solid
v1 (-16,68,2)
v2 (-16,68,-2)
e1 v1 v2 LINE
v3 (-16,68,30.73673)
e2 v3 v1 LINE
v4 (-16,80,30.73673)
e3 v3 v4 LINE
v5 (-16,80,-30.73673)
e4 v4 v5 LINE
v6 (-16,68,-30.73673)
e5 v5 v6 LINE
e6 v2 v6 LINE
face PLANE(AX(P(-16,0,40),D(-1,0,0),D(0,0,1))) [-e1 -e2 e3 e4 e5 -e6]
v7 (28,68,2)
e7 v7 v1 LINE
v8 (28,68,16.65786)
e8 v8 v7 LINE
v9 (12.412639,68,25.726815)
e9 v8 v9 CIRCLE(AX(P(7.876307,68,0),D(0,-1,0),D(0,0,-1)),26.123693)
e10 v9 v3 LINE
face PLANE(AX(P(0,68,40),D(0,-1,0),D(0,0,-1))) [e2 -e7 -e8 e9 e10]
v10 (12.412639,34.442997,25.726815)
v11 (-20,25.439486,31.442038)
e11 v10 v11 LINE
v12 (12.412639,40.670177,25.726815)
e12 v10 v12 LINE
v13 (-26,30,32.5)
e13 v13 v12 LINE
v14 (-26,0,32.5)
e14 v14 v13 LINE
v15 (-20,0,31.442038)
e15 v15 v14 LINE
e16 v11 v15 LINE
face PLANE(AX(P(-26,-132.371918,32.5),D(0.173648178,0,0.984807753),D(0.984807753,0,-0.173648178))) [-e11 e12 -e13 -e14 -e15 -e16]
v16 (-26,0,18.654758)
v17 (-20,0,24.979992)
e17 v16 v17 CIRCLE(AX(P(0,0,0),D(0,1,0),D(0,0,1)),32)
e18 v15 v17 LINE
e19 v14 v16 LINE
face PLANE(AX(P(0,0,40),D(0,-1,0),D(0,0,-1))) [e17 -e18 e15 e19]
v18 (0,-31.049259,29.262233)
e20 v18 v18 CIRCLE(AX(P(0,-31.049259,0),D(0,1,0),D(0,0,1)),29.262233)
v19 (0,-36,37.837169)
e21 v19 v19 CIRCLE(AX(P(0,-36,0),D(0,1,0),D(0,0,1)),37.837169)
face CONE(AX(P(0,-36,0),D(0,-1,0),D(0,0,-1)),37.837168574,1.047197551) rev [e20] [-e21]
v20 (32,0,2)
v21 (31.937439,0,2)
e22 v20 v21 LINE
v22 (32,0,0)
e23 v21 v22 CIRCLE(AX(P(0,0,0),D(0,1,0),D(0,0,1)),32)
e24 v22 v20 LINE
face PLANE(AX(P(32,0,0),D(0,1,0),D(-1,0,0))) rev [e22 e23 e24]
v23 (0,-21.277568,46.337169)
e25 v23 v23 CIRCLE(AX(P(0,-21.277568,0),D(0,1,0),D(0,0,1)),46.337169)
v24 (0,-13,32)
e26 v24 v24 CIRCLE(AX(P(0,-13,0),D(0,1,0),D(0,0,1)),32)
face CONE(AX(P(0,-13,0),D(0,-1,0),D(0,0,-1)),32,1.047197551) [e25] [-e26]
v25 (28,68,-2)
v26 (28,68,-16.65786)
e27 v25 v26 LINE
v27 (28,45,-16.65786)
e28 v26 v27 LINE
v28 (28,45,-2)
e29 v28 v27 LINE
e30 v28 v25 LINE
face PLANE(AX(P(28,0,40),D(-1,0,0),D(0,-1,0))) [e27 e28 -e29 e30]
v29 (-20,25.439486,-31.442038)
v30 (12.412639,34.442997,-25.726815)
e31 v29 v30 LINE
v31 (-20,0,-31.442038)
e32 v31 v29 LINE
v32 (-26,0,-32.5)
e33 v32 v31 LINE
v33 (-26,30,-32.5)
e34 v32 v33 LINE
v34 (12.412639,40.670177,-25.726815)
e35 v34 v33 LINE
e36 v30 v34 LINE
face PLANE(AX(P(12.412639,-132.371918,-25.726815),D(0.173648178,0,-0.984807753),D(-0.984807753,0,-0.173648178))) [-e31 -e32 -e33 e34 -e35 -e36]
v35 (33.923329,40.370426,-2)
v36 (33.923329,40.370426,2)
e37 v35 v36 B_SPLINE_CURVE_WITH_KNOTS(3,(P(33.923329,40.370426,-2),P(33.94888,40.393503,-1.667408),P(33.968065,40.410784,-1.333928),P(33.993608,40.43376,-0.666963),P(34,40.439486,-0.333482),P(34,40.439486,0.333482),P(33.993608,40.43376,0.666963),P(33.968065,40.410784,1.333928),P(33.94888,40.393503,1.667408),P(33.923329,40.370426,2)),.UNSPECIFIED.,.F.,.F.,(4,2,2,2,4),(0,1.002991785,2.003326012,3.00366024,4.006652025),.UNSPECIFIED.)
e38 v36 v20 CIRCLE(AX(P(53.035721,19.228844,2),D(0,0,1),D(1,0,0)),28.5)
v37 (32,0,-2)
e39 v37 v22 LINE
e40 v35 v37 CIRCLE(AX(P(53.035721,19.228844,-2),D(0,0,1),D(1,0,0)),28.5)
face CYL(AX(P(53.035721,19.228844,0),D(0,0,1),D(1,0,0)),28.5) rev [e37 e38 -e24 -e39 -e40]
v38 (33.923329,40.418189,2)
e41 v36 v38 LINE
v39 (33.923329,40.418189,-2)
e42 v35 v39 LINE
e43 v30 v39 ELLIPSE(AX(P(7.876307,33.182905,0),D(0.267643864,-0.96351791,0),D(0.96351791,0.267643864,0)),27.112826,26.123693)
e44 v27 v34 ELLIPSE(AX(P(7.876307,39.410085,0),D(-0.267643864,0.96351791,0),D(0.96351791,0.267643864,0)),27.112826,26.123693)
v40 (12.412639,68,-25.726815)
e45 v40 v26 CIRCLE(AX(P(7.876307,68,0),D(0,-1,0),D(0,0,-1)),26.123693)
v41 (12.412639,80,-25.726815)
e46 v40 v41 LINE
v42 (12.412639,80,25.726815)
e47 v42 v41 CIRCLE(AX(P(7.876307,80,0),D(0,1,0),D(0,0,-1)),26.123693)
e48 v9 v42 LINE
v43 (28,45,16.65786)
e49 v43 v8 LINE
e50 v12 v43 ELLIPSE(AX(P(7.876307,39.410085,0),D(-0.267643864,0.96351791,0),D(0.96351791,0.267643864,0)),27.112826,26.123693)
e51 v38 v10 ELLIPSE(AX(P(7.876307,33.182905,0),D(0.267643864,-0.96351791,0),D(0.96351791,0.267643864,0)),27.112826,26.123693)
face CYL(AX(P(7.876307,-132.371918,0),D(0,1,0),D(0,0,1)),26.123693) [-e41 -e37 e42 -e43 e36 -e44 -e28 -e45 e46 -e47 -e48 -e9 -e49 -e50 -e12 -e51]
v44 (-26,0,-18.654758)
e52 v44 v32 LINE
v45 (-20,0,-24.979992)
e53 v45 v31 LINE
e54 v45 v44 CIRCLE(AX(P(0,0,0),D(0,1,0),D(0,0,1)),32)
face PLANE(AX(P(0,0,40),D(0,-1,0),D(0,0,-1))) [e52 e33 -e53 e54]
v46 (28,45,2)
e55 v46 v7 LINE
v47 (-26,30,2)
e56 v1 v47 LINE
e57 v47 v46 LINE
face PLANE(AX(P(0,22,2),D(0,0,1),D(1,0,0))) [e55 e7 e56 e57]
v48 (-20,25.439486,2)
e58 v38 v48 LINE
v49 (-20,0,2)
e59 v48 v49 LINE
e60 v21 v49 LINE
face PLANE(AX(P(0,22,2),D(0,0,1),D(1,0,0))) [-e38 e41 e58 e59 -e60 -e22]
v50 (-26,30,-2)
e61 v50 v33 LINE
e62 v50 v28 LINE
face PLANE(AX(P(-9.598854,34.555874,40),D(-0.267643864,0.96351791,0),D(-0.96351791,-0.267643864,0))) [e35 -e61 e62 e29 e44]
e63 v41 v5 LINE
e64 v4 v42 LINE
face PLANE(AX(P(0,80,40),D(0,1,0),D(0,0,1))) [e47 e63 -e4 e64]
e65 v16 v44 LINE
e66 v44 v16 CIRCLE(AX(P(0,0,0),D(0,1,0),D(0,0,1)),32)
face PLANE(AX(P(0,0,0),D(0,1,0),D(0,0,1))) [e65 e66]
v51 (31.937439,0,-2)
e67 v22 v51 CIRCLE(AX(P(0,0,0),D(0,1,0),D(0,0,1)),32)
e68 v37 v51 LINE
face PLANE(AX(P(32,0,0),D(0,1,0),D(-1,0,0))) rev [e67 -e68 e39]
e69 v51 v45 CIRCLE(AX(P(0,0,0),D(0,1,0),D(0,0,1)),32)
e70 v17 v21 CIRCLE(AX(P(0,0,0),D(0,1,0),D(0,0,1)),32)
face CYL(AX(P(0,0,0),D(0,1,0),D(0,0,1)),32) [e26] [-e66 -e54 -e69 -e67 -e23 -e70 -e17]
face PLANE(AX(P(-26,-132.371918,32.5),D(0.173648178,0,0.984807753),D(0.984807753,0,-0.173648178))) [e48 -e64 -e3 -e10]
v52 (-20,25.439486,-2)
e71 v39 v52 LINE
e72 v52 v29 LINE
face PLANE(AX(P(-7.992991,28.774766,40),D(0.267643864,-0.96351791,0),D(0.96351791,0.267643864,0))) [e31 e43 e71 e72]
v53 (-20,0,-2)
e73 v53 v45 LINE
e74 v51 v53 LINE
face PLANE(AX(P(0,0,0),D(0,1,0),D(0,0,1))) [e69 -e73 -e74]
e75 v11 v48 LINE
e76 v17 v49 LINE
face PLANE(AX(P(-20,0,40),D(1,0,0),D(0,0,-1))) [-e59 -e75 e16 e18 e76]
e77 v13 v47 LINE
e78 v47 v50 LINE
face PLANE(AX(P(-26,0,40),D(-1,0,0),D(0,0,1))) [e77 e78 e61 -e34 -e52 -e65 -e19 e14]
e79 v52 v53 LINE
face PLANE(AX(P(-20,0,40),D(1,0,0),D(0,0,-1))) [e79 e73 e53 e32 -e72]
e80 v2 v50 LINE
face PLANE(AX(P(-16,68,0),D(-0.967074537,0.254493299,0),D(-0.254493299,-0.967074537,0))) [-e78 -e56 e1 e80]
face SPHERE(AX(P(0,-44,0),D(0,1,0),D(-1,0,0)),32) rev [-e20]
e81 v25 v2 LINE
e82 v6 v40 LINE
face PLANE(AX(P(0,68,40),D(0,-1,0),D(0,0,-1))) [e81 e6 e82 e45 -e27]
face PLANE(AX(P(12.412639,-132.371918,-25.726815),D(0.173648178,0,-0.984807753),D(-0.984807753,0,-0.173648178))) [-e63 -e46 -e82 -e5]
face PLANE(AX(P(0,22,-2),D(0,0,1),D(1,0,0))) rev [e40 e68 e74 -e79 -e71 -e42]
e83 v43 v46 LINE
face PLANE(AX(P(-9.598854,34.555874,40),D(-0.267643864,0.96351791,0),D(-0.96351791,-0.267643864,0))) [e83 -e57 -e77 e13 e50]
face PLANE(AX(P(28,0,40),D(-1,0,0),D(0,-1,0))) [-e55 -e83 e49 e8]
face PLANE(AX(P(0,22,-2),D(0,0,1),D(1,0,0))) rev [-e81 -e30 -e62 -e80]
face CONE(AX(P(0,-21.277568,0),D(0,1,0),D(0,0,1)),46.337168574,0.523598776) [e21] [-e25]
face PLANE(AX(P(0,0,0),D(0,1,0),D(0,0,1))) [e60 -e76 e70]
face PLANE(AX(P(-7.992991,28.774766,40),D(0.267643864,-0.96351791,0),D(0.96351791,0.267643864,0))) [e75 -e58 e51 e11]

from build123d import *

# Parameters (mm, degrees)
BOSS_EXTRUDE1_DEPTH = 40
RIB7_START          = -2
RIB7_DEPTH          = 4
SKETCH2_OUTSIDE_W   = 129.678
SKETCH2_OUTSIDE_H   = 129.678
CUT_EXTRUDE1_DEPTH  = 80
RIB1_REACH          = 105.413
SKETCH3_WALL_W      = 248.119937824
SKETCH3_WALL_H      = 4


# Read off the part's stored shape, not the designer's step: Rib7
with BuildPart() as part:
    # Sketch1 → Revolve1 (revolve)
    with BuildSketch(Plane.XY, mode=Mode.PRIVATE) as revolve1_sk:
        with BuildLine():
            Line((-37.837168574, -36), (-29.262233414, -31.049258877))
            ThreePointArc((-29.262233414, -31.049258877), (-17.458182667, -17.181874451), (0, -12))
            Line((0, -12), (0, 0))
            Line((0, 0), (-32, 0))
            Line((-32, 0), (-32, -13))
            Line((-32, -13), (-46.337168574, -21.277568136))
            Line((-46.337168574, -21.277568136), (-37.837168574, -36))
        make_face()
    revolve(revolve1_sk.sketch.rotate(Axis((0, 0, 0), (0, -1, 0)), 270), axis=Axis((0, 0, 0), (0, -1, 0)))

    # Sketch1<3> → Boss-Extrude1 (add, symmetric)
    with BuildSketch(Plane.XY):
        Polygon((-26, 0), (-20, 0), (-20, 25.439486103), (34, 40.439486103), (34, 80), (-16, 80), (-16, 68), (28, 68), (28, 45), (-26, 30), align=None)
    extrude(amount=BOSS_EXTRUDE1_DEPTH, both=True)

    # Rib7 outline → Rib7 (add)
    with BuildSketch(Plane.XY.offset(RIB7_START)):
        with BuildLine():
            Line((-20, 0), (32, 0))
            ThreePointArc((32, 0), (24.570511929, 20.636636978), (34, 40.439486103))
            Line((34, 40.439486103), (-20, 25.439486103))
            Line((-20, 25.439486103), (-20, 0))
        make_face()
    extrude(amount=RIB7_DEPTH)

    # Sketch2 outside → Cut-Extrude1 (cut)
    with BuildSketch(Plane(origin=(0, 80, 0), x_dir=(1, 0, 0), z_dir=(0, 1, 0))):
        Rectangle(SKETCH2_OUTSIDE_W, SKETCH2_OUTSIDE_H)
        with BuildLine():
            Line((12.412638687, 25.726815399), (-26, 32.5))
            Line((-26, 32.5), (-26, -32.5))
            Line((-26, -32.5), (12.412638687, -25.726815399))
            ThreePointArc((12.412638687, -25.726815399), (34, 0), (12.412638687, 25.726815399))
        make_face(mode=Mode.SUBTRACT)
    extrude(amount=-CUT_EXTRUDE1_DEPTH, mode=Mode.SUBTRACT)

    # Sketch3 wall → Rib1 (add, up to next)
    with BuildSketch(Plane(origin=(-21, 49, 0), x_dir=(-0.25449329928, -0.967074537263, 0), z_dir=(0.967074537263, -0.25449329928, 0)), mode=Mode.PRIVATE) as rib1_sk1:
        Rectangle(SKETCH3_WALL_W, SKETCH3_WALL_H)
    rib1_tool1 = extrude(rib1_sk1.sketch, amount=RIB1_REACH, mode=Mode.PRIVATE) - part.part
    add(rib1_tool1.solids().sort_by_distance((-21, 49, 0))[0])


solid = part.part
